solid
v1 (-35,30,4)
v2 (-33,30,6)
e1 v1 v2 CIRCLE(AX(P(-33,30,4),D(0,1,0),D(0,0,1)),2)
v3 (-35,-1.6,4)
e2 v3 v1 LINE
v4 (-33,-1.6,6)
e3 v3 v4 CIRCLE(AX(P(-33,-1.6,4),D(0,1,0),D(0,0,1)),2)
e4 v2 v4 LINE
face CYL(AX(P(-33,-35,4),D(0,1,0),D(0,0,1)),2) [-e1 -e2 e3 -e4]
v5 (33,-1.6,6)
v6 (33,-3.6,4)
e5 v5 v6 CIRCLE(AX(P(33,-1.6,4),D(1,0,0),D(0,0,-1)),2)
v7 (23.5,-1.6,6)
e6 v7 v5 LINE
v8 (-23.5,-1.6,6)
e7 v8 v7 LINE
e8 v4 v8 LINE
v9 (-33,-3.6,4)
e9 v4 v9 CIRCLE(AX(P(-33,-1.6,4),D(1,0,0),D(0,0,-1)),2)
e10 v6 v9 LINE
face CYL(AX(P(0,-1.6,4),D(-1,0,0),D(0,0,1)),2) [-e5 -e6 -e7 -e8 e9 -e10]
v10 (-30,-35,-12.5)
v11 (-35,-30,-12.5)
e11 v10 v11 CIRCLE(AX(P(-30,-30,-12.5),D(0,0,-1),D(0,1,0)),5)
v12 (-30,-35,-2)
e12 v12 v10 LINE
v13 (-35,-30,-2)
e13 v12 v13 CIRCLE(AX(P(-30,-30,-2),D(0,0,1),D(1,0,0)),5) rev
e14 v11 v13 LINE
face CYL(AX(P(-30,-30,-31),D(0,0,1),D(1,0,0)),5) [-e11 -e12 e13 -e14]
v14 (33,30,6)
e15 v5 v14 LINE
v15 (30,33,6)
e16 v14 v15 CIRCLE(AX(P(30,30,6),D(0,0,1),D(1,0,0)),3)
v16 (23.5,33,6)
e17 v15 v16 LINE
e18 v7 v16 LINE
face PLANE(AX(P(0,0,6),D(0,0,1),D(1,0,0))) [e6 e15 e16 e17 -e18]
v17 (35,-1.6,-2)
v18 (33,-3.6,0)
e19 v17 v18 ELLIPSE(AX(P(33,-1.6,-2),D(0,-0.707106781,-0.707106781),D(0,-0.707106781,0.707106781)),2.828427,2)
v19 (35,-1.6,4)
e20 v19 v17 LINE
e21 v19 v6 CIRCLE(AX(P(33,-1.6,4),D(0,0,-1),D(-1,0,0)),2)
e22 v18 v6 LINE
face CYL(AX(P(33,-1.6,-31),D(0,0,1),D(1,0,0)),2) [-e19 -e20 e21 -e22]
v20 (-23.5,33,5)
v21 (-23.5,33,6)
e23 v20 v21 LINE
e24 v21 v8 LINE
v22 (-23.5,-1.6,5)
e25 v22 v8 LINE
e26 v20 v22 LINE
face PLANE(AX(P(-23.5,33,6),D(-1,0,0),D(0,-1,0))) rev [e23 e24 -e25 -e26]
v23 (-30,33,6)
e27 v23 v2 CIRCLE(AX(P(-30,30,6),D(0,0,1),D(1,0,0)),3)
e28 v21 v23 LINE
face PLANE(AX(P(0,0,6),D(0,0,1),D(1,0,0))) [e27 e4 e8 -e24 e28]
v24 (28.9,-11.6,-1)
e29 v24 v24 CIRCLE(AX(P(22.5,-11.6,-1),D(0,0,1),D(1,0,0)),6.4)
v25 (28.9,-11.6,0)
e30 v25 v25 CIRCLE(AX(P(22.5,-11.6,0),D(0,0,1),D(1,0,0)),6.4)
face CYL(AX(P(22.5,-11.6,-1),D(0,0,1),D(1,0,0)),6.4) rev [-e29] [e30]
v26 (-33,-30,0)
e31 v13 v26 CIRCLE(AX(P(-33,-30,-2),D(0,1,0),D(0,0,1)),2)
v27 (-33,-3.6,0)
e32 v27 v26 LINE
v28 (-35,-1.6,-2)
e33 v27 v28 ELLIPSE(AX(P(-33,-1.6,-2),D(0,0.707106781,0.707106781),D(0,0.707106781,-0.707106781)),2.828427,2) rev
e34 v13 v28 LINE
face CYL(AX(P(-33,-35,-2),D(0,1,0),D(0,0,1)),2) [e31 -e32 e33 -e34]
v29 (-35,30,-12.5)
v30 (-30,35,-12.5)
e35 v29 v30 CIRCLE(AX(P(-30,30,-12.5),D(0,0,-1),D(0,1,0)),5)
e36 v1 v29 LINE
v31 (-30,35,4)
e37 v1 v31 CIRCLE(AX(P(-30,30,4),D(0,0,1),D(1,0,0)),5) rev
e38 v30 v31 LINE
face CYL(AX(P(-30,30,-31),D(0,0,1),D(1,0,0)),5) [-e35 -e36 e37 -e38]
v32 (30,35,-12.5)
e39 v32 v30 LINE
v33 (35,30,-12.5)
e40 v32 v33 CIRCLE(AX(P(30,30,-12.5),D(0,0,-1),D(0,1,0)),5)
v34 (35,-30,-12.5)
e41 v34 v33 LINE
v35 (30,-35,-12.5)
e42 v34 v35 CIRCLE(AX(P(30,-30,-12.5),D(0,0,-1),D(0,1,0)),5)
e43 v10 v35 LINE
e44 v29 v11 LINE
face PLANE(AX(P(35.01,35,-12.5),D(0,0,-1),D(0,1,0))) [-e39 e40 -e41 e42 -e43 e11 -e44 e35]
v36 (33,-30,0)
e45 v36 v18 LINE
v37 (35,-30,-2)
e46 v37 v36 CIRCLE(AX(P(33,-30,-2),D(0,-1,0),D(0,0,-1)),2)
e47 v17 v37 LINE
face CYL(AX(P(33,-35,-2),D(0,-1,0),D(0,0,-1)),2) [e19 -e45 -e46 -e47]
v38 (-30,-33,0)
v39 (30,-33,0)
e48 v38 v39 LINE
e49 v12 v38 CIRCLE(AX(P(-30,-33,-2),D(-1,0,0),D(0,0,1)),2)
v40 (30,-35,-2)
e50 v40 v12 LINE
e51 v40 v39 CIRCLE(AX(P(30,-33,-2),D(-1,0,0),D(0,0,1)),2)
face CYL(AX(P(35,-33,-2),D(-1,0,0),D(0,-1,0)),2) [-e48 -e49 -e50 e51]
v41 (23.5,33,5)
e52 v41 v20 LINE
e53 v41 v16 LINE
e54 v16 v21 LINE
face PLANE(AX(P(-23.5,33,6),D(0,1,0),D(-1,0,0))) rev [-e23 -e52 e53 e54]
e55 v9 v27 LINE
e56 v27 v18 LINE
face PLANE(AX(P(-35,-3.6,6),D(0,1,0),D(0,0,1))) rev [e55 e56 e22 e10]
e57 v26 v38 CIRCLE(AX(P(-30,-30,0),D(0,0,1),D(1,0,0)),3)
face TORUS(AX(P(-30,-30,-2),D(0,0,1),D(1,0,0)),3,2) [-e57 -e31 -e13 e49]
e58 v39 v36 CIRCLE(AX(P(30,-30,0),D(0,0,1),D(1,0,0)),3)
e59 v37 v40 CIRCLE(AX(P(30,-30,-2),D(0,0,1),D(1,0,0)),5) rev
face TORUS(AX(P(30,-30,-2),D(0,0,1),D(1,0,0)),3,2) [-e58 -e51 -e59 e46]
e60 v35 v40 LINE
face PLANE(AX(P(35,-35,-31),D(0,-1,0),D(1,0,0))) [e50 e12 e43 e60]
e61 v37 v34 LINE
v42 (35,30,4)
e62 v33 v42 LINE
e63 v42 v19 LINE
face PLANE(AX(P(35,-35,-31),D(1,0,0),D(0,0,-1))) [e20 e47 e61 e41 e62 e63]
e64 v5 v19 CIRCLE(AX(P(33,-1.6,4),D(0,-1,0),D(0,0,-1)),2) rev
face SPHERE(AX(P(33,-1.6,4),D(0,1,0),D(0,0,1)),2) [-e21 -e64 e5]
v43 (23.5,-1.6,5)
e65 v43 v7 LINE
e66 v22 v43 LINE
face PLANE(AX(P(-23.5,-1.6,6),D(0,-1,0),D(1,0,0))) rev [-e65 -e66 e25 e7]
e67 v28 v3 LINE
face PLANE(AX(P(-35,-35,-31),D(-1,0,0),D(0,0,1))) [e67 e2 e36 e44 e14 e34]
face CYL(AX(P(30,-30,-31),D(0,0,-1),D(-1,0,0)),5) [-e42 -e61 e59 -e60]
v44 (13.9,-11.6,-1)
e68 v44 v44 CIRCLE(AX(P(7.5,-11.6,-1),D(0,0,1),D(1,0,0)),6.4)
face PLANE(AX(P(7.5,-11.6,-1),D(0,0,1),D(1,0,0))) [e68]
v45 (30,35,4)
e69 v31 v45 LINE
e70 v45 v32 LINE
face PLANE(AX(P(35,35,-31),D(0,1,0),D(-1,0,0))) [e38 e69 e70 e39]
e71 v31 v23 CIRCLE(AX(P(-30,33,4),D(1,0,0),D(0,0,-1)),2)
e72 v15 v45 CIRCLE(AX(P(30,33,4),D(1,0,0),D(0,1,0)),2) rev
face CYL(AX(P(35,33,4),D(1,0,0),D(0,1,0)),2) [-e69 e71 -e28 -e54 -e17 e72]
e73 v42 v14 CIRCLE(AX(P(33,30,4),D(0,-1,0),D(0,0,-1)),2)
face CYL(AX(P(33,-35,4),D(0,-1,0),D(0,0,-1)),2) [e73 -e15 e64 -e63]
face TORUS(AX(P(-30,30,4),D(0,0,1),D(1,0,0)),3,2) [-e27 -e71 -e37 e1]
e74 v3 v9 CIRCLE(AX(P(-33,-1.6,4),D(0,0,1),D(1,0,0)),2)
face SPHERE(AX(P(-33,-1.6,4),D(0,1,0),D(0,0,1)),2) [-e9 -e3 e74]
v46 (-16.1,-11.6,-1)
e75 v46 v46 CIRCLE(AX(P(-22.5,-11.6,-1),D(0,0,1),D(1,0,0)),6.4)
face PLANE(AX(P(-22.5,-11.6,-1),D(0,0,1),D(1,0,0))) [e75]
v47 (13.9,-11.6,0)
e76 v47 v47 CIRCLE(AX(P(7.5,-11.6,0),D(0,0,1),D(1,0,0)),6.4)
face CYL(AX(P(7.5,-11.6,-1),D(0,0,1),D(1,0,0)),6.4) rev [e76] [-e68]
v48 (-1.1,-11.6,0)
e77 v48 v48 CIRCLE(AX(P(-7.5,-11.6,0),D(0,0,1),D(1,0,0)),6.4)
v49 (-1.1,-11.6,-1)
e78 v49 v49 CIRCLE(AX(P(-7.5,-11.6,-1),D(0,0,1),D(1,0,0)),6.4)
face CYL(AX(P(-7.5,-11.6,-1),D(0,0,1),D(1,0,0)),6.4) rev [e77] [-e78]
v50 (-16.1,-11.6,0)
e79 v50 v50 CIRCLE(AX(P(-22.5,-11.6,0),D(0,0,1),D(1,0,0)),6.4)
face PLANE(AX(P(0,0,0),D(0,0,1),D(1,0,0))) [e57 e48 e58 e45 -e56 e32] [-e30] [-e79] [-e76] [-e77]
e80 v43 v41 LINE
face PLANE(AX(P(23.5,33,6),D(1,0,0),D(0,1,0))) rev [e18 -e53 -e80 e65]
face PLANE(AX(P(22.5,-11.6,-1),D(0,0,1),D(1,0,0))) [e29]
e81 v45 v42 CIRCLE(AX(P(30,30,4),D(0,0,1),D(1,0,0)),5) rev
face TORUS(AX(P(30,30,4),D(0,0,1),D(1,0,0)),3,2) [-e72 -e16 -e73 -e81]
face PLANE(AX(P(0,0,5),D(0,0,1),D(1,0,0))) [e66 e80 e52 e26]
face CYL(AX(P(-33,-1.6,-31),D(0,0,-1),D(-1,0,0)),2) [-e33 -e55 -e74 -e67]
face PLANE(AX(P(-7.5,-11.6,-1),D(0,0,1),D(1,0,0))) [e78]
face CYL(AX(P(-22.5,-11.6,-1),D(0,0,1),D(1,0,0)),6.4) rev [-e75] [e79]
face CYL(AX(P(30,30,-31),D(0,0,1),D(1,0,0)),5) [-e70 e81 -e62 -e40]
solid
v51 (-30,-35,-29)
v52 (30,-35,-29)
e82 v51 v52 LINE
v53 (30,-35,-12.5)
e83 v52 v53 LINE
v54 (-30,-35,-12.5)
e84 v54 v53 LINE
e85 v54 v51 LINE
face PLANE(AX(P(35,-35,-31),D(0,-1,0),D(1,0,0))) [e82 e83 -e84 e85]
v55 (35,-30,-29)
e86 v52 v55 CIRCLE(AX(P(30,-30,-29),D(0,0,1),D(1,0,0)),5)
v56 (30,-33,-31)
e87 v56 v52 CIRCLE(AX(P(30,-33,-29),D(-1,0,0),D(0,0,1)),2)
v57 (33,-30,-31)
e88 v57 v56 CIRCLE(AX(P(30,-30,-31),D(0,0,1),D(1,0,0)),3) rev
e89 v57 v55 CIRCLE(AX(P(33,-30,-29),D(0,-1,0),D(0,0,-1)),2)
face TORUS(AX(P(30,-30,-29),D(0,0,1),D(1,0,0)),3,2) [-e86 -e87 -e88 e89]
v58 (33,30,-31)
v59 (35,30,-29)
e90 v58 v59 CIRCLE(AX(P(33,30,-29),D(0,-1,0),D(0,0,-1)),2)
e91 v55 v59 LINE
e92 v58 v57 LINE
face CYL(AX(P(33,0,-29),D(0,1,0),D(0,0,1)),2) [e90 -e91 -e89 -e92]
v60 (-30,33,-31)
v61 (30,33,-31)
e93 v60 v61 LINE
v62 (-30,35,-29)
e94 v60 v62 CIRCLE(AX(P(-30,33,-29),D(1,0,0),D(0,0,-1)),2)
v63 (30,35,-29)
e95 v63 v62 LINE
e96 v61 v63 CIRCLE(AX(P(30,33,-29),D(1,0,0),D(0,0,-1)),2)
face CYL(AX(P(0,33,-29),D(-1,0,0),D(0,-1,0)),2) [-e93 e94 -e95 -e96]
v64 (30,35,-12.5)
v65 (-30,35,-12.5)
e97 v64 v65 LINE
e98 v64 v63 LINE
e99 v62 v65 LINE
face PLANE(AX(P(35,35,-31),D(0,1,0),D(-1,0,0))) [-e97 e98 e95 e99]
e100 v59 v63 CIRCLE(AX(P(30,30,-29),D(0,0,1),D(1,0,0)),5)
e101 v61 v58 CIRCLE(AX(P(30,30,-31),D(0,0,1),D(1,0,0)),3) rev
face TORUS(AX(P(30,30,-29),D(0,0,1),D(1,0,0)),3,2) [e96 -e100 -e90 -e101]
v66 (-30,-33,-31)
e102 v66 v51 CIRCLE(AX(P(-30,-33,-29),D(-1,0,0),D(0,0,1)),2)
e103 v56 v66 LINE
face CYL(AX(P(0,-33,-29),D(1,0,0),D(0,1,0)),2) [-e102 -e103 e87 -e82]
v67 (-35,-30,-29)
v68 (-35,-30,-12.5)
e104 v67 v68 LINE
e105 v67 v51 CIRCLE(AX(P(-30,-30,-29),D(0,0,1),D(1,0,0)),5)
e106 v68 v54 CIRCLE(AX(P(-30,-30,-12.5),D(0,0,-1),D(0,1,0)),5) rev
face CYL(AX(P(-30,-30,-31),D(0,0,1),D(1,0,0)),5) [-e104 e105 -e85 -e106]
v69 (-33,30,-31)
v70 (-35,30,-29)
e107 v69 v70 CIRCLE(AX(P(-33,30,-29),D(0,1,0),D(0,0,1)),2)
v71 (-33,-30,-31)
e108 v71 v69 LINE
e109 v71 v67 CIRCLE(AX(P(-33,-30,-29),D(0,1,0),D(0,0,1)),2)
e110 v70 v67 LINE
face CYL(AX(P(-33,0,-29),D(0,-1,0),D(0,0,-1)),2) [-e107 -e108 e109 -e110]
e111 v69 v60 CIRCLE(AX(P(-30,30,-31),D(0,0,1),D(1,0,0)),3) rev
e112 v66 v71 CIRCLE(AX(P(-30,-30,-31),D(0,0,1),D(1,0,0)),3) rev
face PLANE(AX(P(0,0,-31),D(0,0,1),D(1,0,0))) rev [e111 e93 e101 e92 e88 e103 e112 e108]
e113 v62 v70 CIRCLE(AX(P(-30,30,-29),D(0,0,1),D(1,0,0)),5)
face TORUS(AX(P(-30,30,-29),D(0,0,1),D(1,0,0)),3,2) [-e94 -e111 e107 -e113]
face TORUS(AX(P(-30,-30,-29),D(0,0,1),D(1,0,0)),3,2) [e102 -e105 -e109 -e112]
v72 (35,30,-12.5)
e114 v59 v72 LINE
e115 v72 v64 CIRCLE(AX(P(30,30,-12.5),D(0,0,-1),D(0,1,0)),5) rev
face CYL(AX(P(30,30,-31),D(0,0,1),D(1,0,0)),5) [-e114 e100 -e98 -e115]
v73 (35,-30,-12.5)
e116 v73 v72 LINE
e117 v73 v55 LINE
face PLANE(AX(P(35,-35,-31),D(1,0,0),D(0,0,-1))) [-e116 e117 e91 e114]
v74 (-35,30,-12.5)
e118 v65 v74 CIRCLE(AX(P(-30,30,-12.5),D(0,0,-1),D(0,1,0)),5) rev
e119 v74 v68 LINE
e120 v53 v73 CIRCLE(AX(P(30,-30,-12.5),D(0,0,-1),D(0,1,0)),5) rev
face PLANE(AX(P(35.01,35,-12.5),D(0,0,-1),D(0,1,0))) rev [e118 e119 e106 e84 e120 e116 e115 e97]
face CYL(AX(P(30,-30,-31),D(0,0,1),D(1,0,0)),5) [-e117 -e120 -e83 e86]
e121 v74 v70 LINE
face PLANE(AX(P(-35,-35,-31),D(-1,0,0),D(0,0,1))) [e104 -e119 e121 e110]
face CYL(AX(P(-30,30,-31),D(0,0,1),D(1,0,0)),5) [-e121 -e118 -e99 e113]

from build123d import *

# Parameters (mm, degrees)
SKETCH_1_W                     = 70
SKETCH_1_H                     = 70
EXTRUDE_2_DEPTH                = 31
SKETCH_4_W                     = 70
SKETCH_4_H                     = 38.6
EXTRUDE_3_DEPTH                = 6
SKETCH_3_R                     = 6.4
CUT_EXTRUDE_2_DEPTH            = 1
SPLIT_BODIES_1_SURFACE_1_BACK  = 106.683
SPLIT_BODIES_1_SURFACE_1_DEPTH = 213.366
SPLIT_BODIES_1_SURFACE_2_BACK  = 106.683
SPLIT_BODIES_1_SURFACE_2_DEPTH = 213.366
WRAP_START                     = 5
WRAP_1_OUTLINE_W               = 47
WRAP_1_OUTLINE_H               = 34.6
WRAP_1_DEPTH                   = 1
FILLET_1_R                     = 5
FILLET_2_R                     = 2
FILLET_3_R                     = 5
FILLET_4_R                     = 5
FILLET_5_R                     = 5
FILLET_START                   = -30
FILLET_6_DEPTH                 = 65
FILLET_6_2_ANGLE               = 90
FILLET_7_R                     = 2
FILLET_8_R                     = 2
FILLET_9_R                     = 5
FILLET_10_R                    = 5
FILLET_11_R                    = 5
FILLET_12_R                    = 5
FILLET_13_R                    = 2


with BuildPart() as part:
    # 草图1 → 凸台-拉伸2 (new body)
    with BuildSketch(Plane.XY):
        Rectangle(SKETCH_1_W, SKETCH_1_H)
    extrude(amount=-EXTRUDE_2_DEPTH)

    # 草图4 → 凸台-拉伸3 (add)
    with BuildSketch(Plane.XY):
        with Locations((0, 15.7)):
            Rectangle(SKETCH_4_W, SKETCH_4_H)
    extrude(amount=EXTRUDE_3_DEPTH)

    # 草图3 → 切除-拉伸2 (cut)
    with BuildSketch(Plane.XY):
        with Locations((-22.5, -11.6)):
            Circle(SKETCH_3_R)
        with Locations((-7.5, -11.6)):
            Circle(SKETCH_3_R)
        with Locations((7.5, -11.6)):
            Circle(SKETCH_3_R)
        with Locations((22.5, -11.6)):
            Circle(SKETCH_3_R)
    extrude(amount=-CUT_EXTRUDE_2_DEPTH, mode=Mode.SUBTRACT)


with BuildPart() as body_2:
    # Split Bodies 1: the piece behind the surface
    add(part.part)
    # Split Bodies 1 surface: a surface, the sketch's curves swept straight by 213.366 mm
    with BuildLine(Plane.ZY.offset(35).offset(-SPLIT_BODIES_1_SURFACE_1_BACK), mode=Mode.PRIVATE) as split_bodies_1_surface_1_path:
        Line((-12.5, 35), (-12.5, -35))
    split_bodies_1_surface_1 = Shell.extrude(split_bodies_1_surface_1_path.wire(), (-1 * SPLIT_BODIES_1_SURFACE_1_DEPTH, 0 * SPLIT_BODIES_1_SURFACE_1_DEPTH, 0 * SPLIT_BODIES_1_SURFACE_1_DEPTH))
    split(bisect_by=split_bodies_1_surface_1, keep=Keep.BOTTOM)

    # 圆角9
    fillet_9_edges = [body_2.edges().sort_by_distance(p)[0] for p in [
        (-35, 35, -21.75),
    ]]
    fillet(fillet_9_edges, radius=FILLET_9_R)

    # 圆角10
    fillet_10_edges = [body_2.edges().sort_by_distance(p)[0] for p in [
        (-35, -35, -21.75),
    ]]
    fillet(fillet_10_edges, radius=FILLET_10_R)

    # 圆角11
    fillet_11_edges = [body_2.edges().sort_by_distance(p)[0] for p in [
        (35, -35, -21.75),
    ]]
    fillet(fillet_11_edges, radius=FILLET_11_R)

    # 圆角12
    fillet_12_edges = [body_2.edges().sort_by_distance(p)[0] for p in [
        (35, 35, -21.75),
    ]]
    fillet(fillet_12_edges, radius=FILLET_12_R)

    # 圆角13
    fillet_13_edges = [body_2.edges().sort_by_distance(p)[0] for p in [
        (-35, 0, -31),
        (-33.535533906, 33.535533906, -31),
        (0, -35, -31),
        (-33.535533906, -33.535533906, -31),
        (35, 0, -31),
        (33.535533906, -33.535533906, -31),
        (0, 35, -31),
        (33.535533906, 33.535533906, -31),
    ]]
    fillet(fillet_13_edges, radius=FILLET_13_R)


with BuildPart() as part_1:
    add(part.part)

    # Split Bodies 1: split by a surface, the side it looks to stays
    # Split Bodies 1 surface: a surface, the sketch's curves swept straight by 213.366 mm
    with BuildLine(Plane.ZY.offset(35).offset(-SPLIT_BODIES_1_SURFACE_2_BACK), mode=Mode.PRIVATE) as split_bodies_1_surface_2_path:
        Line((-12.5, 35), (-12.5, -35))
    split_bodies_1_surface_2 = Shell.extrude(split_bodies_1_surface_2_path.wire(), (-1 * SPLIT_BODIES_1_SURFACE_2_DEPTH, 0 * SPLIT_BODIES_1_SURFACE_2_DEPTH, 0 * SPLIT_BODIES_1_SURFACE_2_DEPTH))
    split(bisect_by=split_bodies_1_surface_2, keep=Keep.TOP)

    # 包覆1: read off the stored shape, not the designer's step
    # 包覆1 outline → 包覆1 (cut)
    with BuildSketch(Plane.XY.offset(WRAP_START)):
        with Locations((0, 15.7)):
            Rectangle(WRAP_1_OUTLINE_W, WRAP_1_OUTLINE_H)
    extrude(amount=WRAP_1_DEPTH, mode=Mode.SUBTRACT)

    # 圆角1
    fillet_1_edges = [part_1.edges().sort_by_distance(p)[0] for p in [
        (-35, 35, -3.25),
    ]]
    fillet(fillet_1_edges, radius=FILLET_1_R)

    # 圆角2
    fillet_2_edges = [part_1.edges().sort_by_distance(p)[0] for p in [
        (2.5, 35, 6),
        (-35, 13.2, 6),
        (-33.535533906, 33.535533906, 6),
    ]]
    fillet(fillet_2_edges, radius=FILLET_2_R - 0.0001)  # a hair under: the kernel refuses the full size

    # 圆角3
    # the kernel refuses this fillet: 5 mm, written as the material it takes off along each edge
    with BuildSketch(Plane(origin=(35, 35, -25), x_dir=(-1, 0, 0), z_dir=(0, 0, 1))) as fillet_3_piece_1:
        with BuildLine():
            CenterArc((FILLET_3_R, FILLET_3_R), FILLET_3_R, 180, 90)
            Line((0, FILLET_3_R), (0, 0))
            Line((0, 0), (FILLET_3_R, 0))
        make_face()
    extrude(amount=41.5001, mode=Mode.SUBTRACT)

    # 圆角4
    fillet_4_edges = [part_1.edges().sort_by_distance(p)[0] for p in [
        (-35, -35, -6.25),
    ]]
    fillet(fillet_4_edges, radius=FILLET_4_R)

    # 圆角5
    fillet_5_edges = [part_1.edges().sort_by_distance(p)[0] for p in [
        (35, -35, -6.25),
    ]]
    fillet(fillet_5_edges, radius=FILLET_5_R)

    # 圆角6: read off the stored shape, not the designer's step
    # 圆角6 outline → 圆角6 (cut)
    with BuildSketch(Plane(origin=(0, 0, 0), x_dir=(1, 0, 0), z_dir=(0, 1, 0)).offset(FILLET_START)):
        with BuildLine():
            Line((35, -6), (35, -4))
            ThreePointArc((35, -4), (34.414213562, -5.414213562), (33, -6))
            Line((33, -6), (35, -6))
        make_face()
    extrude(amount=FILLET_6_DEPTH, mode=Mode.SUBTRACT)

    # Fillet 6 2 outline → Fillet 6 2 (revolve, cut)
    with BuildSketch(Plane(origin=(30, 30, 0), x_dir=(1, 0, 0), z_dir=(0, -1, 0))):
        with BuildLine():
            ThreePointArc((3, 6), (4.414213562, 5.414213562), (5, 4))
            Line((5, 4), (5, 6))
            Line((5, 6), (3, 6))
        make_face()
    revolve(axis=Axis((30, 30, 0), (0, 0, 1)), revolution_arc=FILLET_6_2_ANGLE, mode=Mode.SUBTRACT)

    # 圆角7
    fillet_7_edges = [part_1.edges().sort_by_distance(p)[0] for p in [
        (-35, -3.6, 2.00005),
        (-5e-05, -3.6, 6),
        (-34.414242852, -3.6, 5.414242852),
        (35, -3.6, 2),
        (34.414213562, -3.6, 5.414213562),
    ]]
    fillet(fillet_7_edges, radius=FILLET_7_R - 0.0001)  # a hair under: the kernel refuses the full size

    # 圆角8
    fillet_8_edges = [part_1.edges().sort_by_distance(p)[0] for p in [
        (-35, -15.80005, 0),
        (0, -35, 0),
        (-33.535533906, -33.535533906, 0),
        (35, -15.80005, 0),
        (33.535533906, -33.535533906, 0),
    ]]
    fillet(fillet_8_edges, radius=FILLET_8_R - 0.0001)  # a hair under: the kernel refuses the full size


solid = Compound([body_2.part, part_1.part])
